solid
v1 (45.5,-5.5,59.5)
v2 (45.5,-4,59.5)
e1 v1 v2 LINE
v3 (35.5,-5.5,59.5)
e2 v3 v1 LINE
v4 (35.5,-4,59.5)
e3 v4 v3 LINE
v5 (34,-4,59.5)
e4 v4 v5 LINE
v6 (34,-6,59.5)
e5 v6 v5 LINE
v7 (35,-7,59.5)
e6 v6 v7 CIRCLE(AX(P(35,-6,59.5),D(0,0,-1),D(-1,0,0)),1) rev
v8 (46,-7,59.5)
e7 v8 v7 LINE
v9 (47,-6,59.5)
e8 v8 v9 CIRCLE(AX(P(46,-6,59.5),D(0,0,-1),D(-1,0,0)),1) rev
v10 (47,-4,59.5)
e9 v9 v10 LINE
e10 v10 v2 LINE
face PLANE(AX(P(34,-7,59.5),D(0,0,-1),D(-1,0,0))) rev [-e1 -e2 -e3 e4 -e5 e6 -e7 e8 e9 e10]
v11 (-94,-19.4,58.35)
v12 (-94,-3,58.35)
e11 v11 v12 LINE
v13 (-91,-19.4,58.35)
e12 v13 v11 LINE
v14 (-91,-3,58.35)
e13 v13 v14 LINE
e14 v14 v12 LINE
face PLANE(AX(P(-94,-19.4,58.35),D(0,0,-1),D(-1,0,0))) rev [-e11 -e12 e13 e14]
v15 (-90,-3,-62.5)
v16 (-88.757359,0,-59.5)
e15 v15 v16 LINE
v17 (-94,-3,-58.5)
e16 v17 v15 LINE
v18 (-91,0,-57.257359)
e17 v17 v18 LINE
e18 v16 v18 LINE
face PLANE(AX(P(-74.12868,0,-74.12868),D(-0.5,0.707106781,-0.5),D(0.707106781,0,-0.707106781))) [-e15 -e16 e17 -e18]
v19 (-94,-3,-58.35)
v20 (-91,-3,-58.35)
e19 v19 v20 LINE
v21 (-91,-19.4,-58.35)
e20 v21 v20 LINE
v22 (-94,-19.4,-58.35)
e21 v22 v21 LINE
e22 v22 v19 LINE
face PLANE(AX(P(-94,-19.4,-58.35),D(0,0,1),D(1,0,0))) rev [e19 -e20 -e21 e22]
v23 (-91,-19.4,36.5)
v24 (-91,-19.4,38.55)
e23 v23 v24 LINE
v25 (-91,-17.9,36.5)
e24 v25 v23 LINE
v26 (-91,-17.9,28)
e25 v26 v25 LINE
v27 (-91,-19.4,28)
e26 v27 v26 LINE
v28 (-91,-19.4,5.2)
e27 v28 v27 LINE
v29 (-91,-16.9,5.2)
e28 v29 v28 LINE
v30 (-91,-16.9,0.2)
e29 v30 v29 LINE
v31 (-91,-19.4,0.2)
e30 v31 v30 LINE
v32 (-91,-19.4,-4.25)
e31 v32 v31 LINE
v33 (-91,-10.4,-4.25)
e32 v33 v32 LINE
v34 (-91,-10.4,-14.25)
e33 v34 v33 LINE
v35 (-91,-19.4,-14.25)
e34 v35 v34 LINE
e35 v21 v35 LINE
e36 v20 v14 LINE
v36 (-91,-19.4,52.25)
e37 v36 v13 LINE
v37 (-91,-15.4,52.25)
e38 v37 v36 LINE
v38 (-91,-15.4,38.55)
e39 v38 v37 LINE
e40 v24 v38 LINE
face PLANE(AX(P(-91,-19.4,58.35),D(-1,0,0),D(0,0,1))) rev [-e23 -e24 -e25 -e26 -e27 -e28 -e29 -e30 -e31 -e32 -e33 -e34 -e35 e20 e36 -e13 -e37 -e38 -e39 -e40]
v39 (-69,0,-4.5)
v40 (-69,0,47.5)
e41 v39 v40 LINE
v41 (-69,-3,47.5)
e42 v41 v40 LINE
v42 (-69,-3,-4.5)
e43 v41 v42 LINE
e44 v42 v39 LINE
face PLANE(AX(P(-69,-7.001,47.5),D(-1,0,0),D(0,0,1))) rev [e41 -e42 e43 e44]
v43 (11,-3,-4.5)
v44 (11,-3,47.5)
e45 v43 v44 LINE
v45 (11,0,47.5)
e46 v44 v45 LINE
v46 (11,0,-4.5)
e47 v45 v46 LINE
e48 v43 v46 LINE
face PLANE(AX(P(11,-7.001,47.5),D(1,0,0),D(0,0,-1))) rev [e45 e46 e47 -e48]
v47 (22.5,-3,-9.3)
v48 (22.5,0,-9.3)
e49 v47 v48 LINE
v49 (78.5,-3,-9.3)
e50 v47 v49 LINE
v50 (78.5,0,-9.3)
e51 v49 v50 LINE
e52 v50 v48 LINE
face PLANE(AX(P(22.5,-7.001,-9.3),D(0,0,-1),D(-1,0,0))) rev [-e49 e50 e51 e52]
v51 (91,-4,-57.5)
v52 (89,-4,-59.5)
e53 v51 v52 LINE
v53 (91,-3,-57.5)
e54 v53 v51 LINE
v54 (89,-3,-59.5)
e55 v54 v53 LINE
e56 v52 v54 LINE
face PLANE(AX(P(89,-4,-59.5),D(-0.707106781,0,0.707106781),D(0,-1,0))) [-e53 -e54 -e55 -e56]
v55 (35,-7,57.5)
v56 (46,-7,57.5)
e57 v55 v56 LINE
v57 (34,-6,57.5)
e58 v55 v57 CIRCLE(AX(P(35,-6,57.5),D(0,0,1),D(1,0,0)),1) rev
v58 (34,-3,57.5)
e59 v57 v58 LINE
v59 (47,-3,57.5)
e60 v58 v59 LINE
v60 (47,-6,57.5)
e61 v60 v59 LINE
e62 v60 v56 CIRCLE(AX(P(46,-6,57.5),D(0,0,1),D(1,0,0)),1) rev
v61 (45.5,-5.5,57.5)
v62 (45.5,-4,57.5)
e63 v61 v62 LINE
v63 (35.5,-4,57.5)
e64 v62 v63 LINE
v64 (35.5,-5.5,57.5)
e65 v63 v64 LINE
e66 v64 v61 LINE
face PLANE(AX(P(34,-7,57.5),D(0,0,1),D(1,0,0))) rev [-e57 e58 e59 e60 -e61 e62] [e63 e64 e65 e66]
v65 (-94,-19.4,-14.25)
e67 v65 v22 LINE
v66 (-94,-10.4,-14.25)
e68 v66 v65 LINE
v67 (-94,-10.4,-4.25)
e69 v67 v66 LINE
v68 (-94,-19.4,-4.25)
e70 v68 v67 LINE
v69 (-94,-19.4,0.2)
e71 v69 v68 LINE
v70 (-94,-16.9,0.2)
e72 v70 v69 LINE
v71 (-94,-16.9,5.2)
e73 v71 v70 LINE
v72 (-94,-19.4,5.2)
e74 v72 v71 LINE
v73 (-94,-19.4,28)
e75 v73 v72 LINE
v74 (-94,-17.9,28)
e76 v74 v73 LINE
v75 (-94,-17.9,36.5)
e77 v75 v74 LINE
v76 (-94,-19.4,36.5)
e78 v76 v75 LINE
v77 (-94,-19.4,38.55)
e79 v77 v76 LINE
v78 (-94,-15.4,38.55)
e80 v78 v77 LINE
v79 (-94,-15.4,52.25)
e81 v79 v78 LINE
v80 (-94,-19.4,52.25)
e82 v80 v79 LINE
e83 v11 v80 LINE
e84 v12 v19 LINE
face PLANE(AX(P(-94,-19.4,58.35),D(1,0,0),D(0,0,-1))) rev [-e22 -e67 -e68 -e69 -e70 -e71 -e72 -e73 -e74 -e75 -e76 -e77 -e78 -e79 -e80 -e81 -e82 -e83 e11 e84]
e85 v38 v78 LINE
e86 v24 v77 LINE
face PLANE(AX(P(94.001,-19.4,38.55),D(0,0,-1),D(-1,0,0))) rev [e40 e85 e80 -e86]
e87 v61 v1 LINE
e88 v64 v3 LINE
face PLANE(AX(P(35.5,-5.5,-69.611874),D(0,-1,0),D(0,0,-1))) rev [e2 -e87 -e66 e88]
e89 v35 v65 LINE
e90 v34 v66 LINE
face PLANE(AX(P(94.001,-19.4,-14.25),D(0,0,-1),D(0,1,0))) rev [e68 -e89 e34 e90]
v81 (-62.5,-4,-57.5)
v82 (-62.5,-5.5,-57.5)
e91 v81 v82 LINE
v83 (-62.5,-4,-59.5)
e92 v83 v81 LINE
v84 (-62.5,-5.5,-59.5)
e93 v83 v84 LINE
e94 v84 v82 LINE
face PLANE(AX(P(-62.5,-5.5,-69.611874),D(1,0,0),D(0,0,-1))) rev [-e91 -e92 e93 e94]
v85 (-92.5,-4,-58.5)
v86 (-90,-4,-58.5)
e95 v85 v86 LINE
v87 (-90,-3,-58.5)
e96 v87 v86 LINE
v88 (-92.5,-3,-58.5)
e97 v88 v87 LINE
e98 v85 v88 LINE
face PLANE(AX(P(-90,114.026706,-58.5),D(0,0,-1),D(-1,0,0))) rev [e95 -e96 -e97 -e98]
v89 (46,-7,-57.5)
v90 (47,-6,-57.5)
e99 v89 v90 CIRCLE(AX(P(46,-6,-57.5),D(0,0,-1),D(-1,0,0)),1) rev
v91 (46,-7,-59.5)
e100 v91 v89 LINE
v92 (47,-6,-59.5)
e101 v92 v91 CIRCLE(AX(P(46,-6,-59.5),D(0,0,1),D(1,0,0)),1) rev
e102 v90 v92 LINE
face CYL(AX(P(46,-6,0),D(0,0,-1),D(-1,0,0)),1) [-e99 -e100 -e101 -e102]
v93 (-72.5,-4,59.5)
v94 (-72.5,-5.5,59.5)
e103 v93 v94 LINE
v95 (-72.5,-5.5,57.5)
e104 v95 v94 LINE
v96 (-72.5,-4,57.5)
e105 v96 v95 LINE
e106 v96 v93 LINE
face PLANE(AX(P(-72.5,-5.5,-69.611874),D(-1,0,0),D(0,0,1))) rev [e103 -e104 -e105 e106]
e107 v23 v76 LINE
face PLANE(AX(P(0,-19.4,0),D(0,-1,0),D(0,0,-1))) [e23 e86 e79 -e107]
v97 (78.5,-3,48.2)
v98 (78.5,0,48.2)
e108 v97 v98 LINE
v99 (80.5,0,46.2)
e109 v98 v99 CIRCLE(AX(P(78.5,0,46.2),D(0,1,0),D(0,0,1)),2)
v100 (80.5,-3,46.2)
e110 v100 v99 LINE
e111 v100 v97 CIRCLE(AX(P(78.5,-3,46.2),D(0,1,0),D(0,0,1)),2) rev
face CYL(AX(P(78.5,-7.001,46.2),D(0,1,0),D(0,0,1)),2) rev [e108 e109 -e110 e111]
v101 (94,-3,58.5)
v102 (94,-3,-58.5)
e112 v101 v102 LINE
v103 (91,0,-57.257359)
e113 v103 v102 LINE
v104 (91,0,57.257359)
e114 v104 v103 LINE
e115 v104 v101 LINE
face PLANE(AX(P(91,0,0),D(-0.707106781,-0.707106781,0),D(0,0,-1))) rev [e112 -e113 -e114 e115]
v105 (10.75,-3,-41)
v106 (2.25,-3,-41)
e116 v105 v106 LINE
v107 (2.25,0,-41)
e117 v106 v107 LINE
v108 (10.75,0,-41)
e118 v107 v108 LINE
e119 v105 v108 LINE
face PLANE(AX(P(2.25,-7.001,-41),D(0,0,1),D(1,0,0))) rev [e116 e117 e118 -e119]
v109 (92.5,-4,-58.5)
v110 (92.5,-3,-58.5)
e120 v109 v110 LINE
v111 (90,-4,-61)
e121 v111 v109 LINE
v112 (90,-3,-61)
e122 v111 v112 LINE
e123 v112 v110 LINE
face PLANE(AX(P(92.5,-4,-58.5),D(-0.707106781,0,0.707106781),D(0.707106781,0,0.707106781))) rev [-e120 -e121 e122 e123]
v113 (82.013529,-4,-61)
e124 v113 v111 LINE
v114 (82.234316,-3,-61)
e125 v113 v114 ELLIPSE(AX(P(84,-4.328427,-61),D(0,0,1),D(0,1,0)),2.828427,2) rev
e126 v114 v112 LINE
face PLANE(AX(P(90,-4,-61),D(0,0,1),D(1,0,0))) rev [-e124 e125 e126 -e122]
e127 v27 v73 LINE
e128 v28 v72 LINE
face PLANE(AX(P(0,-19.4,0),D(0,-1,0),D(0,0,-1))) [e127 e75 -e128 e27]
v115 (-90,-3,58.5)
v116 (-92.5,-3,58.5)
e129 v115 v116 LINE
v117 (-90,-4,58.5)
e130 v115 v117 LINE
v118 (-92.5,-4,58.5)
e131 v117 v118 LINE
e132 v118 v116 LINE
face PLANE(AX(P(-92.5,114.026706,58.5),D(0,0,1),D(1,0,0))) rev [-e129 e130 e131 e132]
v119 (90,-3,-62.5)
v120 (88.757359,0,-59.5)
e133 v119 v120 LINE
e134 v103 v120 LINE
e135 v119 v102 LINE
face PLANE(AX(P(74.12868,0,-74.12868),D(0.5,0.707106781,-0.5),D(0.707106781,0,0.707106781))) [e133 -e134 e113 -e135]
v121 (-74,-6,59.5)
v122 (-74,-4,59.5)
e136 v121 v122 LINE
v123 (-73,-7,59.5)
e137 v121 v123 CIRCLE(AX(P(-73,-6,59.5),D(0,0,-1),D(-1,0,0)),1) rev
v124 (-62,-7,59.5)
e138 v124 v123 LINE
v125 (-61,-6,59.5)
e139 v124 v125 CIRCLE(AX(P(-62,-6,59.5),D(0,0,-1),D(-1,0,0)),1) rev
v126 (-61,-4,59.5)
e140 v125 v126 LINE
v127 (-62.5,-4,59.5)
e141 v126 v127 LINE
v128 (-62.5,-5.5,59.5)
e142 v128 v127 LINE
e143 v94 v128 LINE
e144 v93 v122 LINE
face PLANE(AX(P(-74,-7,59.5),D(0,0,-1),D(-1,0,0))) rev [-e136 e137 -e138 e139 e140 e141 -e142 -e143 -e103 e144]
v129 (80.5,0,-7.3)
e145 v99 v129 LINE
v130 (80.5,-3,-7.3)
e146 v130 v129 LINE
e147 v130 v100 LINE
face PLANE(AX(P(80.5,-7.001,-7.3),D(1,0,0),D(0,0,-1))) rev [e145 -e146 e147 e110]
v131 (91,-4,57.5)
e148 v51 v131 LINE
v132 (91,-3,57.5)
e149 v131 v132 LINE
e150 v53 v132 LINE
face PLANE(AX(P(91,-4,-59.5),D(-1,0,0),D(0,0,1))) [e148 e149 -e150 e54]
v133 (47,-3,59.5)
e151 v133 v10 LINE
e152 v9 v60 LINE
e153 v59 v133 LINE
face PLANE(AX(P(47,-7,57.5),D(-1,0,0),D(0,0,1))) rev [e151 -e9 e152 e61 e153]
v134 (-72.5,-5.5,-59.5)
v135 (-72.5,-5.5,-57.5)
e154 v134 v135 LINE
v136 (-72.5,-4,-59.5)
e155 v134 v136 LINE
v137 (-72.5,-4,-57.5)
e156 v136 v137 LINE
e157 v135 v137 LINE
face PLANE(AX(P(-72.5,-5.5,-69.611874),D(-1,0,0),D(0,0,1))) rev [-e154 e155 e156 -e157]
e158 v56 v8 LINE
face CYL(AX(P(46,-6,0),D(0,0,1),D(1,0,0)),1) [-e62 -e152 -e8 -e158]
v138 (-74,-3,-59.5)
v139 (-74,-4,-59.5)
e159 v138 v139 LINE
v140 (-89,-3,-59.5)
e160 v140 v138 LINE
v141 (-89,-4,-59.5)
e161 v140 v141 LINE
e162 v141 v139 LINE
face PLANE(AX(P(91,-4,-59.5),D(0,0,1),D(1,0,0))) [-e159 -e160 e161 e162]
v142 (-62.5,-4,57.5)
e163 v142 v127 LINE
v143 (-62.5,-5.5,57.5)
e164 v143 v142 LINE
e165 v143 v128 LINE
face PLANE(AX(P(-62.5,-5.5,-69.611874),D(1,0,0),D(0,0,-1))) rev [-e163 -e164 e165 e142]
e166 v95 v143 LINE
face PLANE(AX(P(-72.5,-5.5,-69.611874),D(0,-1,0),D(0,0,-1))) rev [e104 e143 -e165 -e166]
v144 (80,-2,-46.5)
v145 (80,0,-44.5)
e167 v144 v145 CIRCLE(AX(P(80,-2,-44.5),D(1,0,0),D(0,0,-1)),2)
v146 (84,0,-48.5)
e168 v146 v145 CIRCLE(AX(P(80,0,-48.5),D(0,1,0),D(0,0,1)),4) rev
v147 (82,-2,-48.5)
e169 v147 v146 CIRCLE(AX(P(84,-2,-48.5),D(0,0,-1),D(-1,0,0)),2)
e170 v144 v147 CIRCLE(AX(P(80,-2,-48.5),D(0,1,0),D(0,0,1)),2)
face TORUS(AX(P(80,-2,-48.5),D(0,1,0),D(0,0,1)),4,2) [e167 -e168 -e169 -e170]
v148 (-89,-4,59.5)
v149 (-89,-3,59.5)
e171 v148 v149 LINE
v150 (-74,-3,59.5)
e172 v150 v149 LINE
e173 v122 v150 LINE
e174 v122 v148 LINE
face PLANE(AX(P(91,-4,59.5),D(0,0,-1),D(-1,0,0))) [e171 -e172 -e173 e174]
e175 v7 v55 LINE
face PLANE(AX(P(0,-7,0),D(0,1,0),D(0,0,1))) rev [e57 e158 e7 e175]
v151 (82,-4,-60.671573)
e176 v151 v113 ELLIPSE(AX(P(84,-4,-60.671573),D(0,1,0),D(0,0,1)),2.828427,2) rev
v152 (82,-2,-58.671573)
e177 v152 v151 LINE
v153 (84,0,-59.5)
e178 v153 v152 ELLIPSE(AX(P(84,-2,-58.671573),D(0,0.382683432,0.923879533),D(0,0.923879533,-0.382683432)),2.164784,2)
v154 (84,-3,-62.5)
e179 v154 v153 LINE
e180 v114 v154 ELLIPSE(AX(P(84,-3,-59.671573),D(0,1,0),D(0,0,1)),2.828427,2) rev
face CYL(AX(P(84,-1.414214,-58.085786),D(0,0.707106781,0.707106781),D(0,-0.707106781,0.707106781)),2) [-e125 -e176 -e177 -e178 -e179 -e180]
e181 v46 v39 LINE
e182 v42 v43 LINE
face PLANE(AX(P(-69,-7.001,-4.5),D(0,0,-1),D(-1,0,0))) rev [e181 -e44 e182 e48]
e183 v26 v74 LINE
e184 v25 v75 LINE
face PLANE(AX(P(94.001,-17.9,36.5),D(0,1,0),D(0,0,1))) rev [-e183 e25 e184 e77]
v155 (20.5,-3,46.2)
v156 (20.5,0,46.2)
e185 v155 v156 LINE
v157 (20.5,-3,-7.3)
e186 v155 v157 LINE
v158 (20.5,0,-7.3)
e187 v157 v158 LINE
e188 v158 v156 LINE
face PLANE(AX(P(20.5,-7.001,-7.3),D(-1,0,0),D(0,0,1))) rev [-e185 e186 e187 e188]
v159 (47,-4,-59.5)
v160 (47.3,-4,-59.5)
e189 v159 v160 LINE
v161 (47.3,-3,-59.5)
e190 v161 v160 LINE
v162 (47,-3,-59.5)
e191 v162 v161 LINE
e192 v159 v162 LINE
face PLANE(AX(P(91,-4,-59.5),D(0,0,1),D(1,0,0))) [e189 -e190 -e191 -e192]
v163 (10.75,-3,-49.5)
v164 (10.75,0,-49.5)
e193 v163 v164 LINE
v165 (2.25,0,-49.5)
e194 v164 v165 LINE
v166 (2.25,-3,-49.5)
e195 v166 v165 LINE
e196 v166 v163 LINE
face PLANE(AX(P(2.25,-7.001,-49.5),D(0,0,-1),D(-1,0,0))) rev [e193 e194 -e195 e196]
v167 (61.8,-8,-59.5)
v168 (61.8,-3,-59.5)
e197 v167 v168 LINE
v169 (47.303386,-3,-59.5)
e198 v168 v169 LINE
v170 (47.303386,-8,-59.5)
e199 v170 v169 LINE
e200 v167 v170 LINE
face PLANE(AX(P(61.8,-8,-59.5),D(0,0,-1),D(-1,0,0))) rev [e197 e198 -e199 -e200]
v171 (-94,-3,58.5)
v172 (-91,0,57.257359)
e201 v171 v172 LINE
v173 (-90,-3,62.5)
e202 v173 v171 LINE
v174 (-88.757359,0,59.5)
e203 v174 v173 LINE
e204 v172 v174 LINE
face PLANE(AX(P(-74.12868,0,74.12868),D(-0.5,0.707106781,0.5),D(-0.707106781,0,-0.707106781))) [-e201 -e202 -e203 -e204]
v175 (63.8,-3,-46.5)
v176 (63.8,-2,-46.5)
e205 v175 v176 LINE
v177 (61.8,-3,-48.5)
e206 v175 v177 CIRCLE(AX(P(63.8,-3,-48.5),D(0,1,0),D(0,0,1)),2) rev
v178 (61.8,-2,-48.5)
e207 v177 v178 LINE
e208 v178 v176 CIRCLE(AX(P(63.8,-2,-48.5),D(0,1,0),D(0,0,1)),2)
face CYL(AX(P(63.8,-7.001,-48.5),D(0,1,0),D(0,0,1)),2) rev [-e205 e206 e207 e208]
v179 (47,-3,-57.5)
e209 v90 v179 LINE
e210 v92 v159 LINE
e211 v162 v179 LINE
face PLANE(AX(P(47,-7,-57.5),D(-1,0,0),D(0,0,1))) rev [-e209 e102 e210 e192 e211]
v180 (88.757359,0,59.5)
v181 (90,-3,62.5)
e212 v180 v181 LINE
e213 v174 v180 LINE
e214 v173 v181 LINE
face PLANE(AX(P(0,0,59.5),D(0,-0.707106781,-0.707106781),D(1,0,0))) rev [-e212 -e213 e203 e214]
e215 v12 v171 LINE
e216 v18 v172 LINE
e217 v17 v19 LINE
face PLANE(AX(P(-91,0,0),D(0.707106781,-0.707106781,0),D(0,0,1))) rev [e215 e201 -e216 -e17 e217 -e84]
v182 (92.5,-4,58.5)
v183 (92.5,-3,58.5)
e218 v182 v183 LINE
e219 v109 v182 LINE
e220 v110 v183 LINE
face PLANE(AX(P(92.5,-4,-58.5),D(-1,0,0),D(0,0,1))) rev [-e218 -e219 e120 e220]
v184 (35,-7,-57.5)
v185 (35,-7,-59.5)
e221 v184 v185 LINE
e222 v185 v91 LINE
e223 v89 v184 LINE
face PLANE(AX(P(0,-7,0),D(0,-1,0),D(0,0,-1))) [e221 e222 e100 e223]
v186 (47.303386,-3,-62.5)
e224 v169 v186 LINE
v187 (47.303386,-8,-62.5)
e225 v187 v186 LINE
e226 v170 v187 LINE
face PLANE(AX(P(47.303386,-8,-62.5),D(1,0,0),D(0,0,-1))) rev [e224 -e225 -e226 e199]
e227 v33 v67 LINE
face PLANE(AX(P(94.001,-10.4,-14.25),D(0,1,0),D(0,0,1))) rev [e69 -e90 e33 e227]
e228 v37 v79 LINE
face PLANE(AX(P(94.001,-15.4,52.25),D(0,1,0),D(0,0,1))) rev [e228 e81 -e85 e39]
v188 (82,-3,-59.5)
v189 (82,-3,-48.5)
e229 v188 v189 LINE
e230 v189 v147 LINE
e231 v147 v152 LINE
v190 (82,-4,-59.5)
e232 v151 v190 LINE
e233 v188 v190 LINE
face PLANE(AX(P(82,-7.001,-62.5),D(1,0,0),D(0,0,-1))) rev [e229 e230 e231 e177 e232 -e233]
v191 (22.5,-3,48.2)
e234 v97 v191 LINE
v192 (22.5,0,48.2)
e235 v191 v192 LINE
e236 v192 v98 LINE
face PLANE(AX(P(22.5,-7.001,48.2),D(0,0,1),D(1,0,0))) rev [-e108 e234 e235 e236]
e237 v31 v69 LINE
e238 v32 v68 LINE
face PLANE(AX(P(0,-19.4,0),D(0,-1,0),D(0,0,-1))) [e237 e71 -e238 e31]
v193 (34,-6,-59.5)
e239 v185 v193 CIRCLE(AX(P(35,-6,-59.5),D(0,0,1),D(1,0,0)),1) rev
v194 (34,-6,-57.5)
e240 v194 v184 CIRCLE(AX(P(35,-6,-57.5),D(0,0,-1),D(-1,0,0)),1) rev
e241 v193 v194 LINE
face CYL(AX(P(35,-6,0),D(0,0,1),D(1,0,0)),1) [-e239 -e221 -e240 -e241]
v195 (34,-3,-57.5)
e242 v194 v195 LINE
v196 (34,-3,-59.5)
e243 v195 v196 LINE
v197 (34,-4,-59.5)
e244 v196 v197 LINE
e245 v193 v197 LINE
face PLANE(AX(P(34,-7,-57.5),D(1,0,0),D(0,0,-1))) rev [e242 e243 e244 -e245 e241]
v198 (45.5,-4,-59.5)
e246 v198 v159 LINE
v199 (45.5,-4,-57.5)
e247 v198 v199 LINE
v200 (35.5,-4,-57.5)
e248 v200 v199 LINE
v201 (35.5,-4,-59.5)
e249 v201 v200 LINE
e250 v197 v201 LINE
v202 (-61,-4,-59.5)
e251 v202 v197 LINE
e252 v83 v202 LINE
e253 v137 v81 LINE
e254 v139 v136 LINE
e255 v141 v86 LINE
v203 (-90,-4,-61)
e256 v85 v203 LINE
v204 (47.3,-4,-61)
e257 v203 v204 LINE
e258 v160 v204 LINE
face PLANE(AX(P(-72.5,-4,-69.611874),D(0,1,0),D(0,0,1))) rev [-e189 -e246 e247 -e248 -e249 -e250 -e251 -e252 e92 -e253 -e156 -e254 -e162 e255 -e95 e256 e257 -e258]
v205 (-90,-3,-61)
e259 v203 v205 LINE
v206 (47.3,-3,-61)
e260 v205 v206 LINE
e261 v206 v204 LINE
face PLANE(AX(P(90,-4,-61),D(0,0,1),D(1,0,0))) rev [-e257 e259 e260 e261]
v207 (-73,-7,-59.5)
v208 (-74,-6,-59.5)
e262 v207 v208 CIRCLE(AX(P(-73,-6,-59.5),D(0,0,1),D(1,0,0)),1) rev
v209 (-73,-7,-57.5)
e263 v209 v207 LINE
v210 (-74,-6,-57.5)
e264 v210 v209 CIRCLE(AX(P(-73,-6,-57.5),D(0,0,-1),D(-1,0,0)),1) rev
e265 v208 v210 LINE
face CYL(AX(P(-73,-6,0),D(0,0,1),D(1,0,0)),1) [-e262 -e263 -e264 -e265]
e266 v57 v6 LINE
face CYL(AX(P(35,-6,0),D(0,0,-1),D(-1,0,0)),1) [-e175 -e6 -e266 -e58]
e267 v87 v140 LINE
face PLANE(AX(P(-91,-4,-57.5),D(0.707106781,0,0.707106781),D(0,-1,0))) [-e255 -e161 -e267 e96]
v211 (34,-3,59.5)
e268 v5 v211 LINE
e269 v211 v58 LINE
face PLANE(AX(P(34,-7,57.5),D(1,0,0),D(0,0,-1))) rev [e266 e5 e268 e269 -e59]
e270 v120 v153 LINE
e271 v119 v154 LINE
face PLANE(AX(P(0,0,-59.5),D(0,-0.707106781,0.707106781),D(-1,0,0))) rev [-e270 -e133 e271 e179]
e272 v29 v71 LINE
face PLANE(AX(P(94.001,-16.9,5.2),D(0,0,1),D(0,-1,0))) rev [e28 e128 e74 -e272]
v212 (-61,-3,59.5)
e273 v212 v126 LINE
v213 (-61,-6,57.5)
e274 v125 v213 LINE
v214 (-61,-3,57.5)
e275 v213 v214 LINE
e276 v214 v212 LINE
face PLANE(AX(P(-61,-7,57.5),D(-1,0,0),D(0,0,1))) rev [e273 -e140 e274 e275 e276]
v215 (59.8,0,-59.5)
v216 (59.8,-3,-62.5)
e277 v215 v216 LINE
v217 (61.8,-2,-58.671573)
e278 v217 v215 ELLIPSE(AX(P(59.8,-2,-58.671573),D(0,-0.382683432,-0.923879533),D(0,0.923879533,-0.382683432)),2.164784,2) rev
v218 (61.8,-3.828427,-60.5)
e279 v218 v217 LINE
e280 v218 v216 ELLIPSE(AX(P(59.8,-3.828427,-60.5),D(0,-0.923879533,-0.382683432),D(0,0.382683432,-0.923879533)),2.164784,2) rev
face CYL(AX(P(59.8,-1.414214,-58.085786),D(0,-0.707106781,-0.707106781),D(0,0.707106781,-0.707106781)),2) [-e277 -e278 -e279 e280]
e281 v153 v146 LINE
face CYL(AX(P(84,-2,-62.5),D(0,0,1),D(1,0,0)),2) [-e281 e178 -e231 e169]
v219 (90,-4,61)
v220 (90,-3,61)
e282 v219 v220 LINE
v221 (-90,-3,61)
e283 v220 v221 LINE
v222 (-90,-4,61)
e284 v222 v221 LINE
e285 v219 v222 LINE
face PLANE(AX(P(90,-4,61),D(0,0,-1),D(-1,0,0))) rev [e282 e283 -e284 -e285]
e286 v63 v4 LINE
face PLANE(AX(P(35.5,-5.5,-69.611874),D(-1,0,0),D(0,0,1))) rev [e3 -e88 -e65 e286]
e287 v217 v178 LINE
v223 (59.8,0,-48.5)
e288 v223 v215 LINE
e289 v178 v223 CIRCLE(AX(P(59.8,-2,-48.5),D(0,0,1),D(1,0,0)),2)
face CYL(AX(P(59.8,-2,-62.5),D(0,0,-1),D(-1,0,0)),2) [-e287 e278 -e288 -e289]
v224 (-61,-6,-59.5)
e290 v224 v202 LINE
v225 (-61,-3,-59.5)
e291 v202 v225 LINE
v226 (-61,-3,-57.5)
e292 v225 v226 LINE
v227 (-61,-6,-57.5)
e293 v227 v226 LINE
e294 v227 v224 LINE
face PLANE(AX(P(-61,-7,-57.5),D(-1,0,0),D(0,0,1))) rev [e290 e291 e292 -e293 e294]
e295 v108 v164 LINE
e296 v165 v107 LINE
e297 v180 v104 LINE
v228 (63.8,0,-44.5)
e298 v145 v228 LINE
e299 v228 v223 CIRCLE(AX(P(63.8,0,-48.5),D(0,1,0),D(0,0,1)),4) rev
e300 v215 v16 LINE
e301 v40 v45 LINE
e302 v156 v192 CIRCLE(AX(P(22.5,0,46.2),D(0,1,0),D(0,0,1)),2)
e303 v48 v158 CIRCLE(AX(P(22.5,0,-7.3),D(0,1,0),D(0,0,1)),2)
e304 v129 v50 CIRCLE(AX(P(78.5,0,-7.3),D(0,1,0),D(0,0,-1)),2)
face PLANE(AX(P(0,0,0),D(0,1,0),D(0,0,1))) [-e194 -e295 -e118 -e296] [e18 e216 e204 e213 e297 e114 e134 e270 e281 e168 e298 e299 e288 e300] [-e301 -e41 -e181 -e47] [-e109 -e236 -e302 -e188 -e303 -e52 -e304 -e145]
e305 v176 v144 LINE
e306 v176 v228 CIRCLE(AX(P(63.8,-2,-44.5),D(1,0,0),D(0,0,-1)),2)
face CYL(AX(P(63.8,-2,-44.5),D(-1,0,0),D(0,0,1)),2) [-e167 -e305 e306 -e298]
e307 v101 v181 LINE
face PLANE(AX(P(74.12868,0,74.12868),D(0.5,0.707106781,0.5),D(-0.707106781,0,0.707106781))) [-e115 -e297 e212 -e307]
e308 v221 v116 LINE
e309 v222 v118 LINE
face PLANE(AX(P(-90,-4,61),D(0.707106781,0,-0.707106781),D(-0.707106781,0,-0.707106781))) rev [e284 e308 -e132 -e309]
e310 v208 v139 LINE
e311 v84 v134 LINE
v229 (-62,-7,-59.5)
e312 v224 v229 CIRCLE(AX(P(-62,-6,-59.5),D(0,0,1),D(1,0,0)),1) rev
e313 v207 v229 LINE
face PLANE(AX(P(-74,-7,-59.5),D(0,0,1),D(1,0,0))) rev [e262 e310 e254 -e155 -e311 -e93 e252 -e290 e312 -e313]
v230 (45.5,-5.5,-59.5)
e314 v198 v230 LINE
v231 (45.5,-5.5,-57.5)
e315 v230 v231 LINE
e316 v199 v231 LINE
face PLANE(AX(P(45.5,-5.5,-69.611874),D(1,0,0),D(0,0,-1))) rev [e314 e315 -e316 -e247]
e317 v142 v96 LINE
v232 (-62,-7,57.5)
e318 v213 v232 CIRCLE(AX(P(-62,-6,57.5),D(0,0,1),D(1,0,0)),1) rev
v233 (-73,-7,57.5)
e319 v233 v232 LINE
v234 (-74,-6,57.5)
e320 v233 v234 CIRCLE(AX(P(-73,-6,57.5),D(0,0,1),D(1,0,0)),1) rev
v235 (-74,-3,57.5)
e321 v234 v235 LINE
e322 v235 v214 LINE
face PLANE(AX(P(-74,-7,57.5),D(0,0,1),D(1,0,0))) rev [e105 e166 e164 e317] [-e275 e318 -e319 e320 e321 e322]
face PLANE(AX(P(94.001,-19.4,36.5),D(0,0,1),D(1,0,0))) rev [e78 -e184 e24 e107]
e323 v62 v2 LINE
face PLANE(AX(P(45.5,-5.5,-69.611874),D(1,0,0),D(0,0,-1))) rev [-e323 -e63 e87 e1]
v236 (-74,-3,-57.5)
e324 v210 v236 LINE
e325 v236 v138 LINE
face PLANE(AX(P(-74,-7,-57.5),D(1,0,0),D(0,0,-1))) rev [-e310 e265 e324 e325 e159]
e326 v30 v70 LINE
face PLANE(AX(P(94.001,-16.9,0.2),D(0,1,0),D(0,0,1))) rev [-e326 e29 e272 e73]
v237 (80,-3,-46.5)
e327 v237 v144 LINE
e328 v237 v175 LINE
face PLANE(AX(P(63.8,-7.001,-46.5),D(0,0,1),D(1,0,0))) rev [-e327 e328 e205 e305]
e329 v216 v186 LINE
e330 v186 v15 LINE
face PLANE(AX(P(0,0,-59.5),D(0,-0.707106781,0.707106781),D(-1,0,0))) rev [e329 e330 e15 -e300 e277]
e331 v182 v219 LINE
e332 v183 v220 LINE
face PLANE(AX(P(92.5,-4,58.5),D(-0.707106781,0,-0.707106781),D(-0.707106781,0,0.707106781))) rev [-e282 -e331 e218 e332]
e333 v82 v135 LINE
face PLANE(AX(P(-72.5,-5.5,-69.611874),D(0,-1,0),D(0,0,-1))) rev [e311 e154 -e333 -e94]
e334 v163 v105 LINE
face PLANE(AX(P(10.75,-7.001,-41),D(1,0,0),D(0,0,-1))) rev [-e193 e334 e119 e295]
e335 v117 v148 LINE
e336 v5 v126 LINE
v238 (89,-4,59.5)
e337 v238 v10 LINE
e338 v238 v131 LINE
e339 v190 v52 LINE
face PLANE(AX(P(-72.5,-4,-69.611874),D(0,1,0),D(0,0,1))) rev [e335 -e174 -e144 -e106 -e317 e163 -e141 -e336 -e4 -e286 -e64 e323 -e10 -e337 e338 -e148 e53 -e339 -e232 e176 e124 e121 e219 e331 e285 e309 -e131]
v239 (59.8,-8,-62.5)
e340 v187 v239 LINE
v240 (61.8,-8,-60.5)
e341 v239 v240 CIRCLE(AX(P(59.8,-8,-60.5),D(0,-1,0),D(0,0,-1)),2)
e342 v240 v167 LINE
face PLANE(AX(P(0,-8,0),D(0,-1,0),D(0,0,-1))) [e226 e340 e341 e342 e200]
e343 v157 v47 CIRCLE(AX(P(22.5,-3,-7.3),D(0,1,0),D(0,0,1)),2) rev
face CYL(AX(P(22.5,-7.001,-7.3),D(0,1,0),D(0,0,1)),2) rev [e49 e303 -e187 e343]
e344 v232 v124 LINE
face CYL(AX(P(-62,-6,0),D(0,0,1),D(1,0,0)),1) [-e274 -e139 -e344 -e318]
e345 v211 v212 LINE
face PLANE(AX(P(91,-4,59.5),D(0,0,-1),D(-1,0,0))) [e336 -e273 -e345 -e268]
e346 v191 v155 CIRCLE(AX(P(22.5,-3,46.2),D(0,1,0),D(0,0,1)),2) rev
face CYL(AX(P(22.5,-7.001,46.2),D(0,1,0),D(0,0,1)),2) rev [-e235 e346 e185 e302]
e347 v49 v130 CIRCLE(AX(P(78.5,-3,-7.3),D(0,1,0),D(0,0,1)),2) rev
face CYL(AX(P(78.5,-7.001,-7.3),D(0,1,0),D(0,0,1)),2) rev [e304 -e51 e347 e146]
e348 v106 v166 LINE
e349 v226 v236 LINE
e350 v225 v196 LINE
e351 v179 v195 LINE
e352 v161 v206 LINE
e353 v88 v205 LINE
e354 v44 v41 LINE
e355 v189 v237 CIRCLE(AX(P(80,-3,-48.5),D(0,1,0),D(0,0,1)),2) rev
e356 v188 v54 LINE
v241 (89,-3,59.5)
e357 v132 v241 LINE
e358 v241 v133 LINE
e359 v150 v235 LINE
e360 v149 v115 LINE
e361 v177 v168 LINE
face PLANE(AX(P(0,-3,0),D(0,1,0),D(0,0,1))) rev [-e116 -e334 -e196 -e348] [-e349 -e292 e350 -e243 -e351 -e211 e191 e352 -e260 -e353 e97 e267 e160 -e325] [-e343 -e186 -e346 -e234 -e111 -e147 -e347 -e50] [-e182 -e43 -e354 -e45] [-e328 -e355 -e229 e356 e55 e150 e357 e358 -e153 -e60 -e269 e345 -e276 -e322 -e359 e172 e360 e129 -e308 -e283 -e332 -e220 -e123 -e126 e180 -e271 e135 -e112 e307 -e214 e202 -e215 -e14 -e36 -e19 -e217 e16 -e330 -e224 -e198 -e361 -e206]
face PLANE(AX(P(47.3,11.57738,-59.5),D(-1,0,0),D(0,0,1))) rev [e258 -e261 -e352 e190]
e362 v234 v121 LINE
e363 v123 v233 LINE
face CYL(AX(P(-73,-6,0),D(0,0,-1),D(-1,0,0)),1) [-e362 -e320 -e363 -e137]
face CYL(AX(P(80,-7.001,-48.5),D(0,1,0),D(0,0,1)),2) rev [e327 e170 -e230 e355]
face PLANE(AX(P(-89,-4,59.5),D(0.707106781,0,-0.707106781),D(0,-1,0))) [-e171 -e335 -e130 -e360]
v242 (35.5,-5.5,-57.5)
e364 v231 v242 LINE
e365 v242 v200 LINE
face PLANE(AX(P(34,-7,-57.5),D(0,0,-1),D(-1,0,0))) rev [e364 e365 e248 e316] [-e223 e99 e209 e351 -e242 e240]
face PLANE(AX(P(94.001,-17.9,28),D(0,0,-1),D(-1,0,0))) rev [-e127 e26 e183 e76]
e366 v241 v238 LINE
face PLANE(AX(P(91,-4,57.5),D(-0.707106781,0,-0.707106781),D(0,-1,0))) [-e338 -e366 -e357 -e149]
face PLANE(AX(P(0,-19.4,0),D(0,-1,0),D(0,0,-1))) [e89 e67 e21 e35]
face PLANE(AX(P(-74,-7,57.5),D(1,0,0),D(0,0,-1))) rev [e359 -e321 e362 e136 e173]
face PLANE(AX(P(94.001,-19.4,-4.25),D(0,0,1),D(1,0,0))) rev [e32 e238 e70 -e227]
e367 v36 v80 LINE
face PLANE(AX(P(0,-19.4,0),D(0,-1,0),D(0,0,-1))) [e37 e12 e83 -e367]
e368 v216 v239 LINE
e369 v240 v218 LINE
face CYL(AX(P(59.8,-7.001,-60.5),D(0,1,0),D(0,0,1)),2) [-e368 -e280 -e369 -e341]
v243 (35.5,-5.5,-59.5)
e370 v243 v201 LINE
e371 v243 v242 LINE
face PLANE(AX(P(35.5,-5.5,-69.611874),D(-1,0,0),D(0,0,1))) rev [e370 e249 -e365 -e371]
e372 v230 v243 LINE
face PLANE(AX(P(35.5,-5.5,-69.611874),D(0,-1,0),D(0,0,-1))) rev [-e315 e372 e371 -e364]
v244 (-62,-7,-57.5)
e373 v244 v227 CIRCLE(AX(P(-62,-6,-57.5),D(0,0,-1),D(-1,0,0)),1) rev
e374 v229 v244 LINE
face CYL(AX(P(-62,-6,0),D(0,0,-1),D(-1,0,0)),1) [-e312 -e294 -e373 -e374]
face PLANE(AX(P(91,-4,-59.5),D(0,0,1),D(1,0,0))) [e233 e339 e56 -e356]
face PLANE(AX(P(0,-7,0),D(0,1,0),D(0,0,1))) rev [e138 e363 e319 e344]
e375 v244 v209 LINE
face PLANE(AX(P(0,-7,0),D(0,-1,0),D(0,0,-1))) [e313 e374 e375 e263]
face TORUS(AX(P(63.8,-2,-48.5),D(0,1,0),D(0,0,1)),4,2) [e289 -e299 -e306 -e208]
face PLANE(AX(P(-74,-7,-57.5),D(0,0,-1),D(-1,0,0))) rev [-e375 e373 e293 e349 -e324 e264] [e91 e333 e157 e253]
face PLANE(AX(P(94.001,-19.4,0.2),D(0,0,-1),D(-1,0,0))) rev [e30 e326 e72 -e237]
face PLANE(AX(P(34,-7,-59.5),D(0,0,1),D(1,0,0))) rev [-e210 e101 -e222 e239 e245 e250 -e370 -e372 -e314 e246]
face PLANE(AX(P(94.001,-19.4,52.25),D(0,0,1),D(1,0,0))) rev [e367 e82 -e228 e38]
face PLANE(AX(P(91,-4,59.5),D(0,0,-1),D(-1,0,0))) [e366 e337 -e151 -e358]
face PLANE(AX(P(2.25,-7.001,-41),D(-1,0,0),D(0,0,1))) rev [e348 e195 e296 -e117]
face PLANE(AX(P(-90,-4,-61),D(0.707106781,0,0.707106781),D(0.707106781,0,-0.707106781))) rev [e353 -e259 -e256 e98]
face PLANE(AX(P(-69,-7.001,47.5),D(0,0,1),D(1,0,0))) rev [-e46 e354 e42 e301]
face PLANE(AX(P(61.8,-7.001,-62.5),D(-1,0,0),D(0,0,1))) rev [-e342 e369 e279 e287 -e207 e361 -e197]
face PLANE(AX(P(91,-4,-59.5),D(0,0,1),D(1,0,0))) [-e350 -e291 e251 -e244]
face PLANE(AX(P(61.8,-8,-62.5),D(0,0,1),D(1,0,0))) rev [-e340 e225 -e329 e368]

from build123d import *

# Parameters (mm, degrees)
EXTRUDE_1_DEPTH     = 3
SKETCH_2_W          = 13.000000000000007
SKETCH_2_H          = 2.000000000000014
SKETCH_2_W_2        = 12.999999999999993
EXTRUDE_2_DEPTH     = 4
CUT_EXTRUDE_1_REACH = 156.172
SKETCH_3_W          = 10.000000000000021
SKETCH_3_H          = 1.5
SKETCH_3_W_2        = 10
FILLET_1_R          = 1
CHAMFER_1_SIZE      = 4
CHAMFER_2_SIZE      = 3
EXTRUDE_3_DEPTH     = 1
CHAMFER_3_SIZE      = 2
CUT_EXTRUDE_2_REACH = 115.098
CUT_EXTRUDE_3_DEPTH = 1
EXTRUDE_4_DEPTH     = 16.4
CUT_EXTRUDE_4_REACH = 201.064
SKETCH_9_W          = 8.500000000000004
SKETCH_9_H          = 1.5000000000000036
SKETCH_10_W         = 14.5
SKETCH_10_H         = 1.5000000000000284
CUT_EXTRUDE_5_DEPTH = 1
SKETCH_11_W         = 14.496613720637008
SKETCH_11_H         = 3.000000000000007
EXTRUDE_5_DEPTH     = 5
FILLET_2_R          = 2


with BuildPart() as part:
    # 草图1 → 凸台-拉伸1 (new body)
    with BuildSketch(Plane(origin=(0, 0, 0), x_dir=(1, 0, 0), z_dir=(0, 1, 0))):
        Polygon((93.99999999999997, -62.499999999999964), (-94.00000000000001, -62.5), (-94.00000000000003, 62.500000000000014), (93.99999999999997, 62.50000000000004), align=None)
    extrude(amount=-EXTRUDE_1_DEPTH)

    # 草图2 → 凸台-拉伸2 (add)
    with BuildSketch(Plane.XZ.offset(3)):
        with Locations((-67.50000000000003, 58.5)):
            Rectangle(SKETCH_2_W, SKETCH_2_H)
        with Locations((40.49999999999994, 58.5)):
            Rectangle(SKETCH_2_W_2, SKETCH_2_H)
        with Locations((40.49999999999994, -58.5)):
            Rectangle(SKETCH_2_W_2, SKETCH_2_H)
        with Locations((-67.50000000000003, -58.5)):
            Rectangle(SKETCH_2_W, SKETCH_2_H)
    extrude(amount=EXTRUDE_2_DEPTH)

    # 切除-拉伸1: up to this face of the body (flat: up to its plane)
    cut_extrude_1_end = Plane(part.part.faces().sort_by_distance((40.5, -5, -59.5))[0])
    # 草图3 → 切除-拉伸1 (cut, up to the picked face)
    with BuildSketch(Plane.XY.offset(59.500000000000036), mode=Mode.PRIVATE) as cut_extrude_1_sk1:
        with Locations((-67.5, -4.75)):
            Rectangle(SKETCH_3_W, SKETCH_3_H)
    cut_extrude_1_tool1 = split(extrude(cut_extrude_1_sk1.sketch, amount=-CUT_EXTRUDE_1_REACH, mode=Mode.PRIVATE), bisect_by=cut_extrude_1_end, keep=Keep.BOTH, mode=Mode.PRIVATE)
    # 草图3 → 切除-拉伸1 (cut, up to the picked face)
    with BuildSketch(Plane.XY.offset(59.500000000000036), mode=Mode.PRIVATE) as cut_extrude_1_sk2:
        with Locations((40.499999999999986, -4.75)):
            Rectangle(SKETCH_3_W_2, SKETCH_3_H)
    cut_extrude_1_tool2 = split(extrude(cut_extrude_1_sk2.sketch, amount=-CUT_EXTRUDE_1_REACH, mode=Mode.PRIVATE), bisect_by=cut_extrude_1_end, keep=Keep.BOTH, mode=Mode.PRIVATE)
    add(cut_extrude_1_tool1.solids().sort_by(Axis((-67.5, -4.75, 59.5), (0, 0, -1)))[0], mode=Mode.SUBTRACT)
    add(cut_extrude_1_tool2.solids().sort_by(Axis((40.5, -4.75, 59.5), (0, 0, -1)))[0], mode=Mode.SUBTRACT)

    # 圆角1
    fillet_1_edges = [part.edges().sort_by_distance(p)[0] for p in [
        (-74.00000000000003, -7, 58.5),
        (-61.00000000000003, -7, 58.5),
        (33.99999999999995, -7, 58.5),
        (46.99999999999994, -7, 58.5),
        (33.99999999999995, -7, -58.5),
        (46.99999999999994, -7, -58.5),
        (-74.00000000000003, -7, -58.5),
        (-61.00000000000003, -7, -58.5),
    ]]
    fillet(fillet_1_edges, radius=FILLET_1_R)

    # 倒角1
    chamfer_1_edges = [part.edges().sort_by_distance(p)[0] for p in [
        (-94.00000000000003, -1.5, -62.500000000000014),
        (93.99999999999997, -1.5, -62.50000000000004),
        (93.99999999999997, -1.5, 62.499999999999964),
        (-94.00000000000001, -1.5, 62.5),
    ]]
    chamfer(chamfer_1_edges, length=CHAMFER_1_SIZE)

    # 倒角2
    chamfer_2_edges = [part.edges().sort_by_distance(p)[0] for p in [
        (91.99999999999997, 0, -60.50000000000005),
        (-2.842e-14, 0, -62.50000000000003),
        (-92.00000000000004, 0, -60.50000000000002),
        (-94.00000000000001, 0, -7.11e-15),
        (-92.00000000000003, 0, 60.5),
        (-2.842e-14, 0, 62.499999999999986),
        (91.99999999999999, 0, 60.499999999999964),
        (93.99999999999997, 0, -4.974e-14),
    ]]
    chamfer(chamfer_2_edges, length=CHAMFER_2_SIZE - 0.0001)  # a hair under: the kernel refuses the full size

    # 草图4 → 凸台-拉伸3 (add)
    with BuildSketch(Plane.XZ.offset(3)):
        Polygon((-89.99999999999997, -61.00000000000003), (-92.49999999999997, -58.50000000000002), (-92.49999999999999, 58.499999999999964), (-89.99999999999999, 60.999999999999964), (90.00000000000001, 60.99999999999999), (92.50000000000001, 58.49999999999999), (92.50000000000003, -58.5), (90.00000000000003, -61.00000000000001), align=None)
        Polygon((91, -59.49999999999999), (-91, -59.500000000000014), (-91, 59.49999999999998), (91, 59.50000000000001), align=None, mode=Mode.SUBTRACT)
    extrude(amount=EXTRUDE_3_DEPTH)

    # 倒角3
    chamfer_3_edges = [part.edges().sort_by_distance(p)[0] for p in [
        (91, -3.5, -59.49999999999999),
        (-91, -3.5, 59.49999999999998),
        (-91, -3.5, -59.500000000000014),
        (91, -3.5, 59.50000000000001),
    ]]
    chamfer(chamfer_3_edges, length=CHAMFER_3_SIZE)

    # 草图5 → 切除-拉伸2 (cut, up to next)
    with BuildSketch(Plane(origin=(0, 0, 0), x_dir=(1, 0, 0), z_dir=(0, 1, 0)), mode=Mode.PRIVATE) as cut_extrude_2_sk1:
        Polygon((-68.99999999999999, -47.49999999999995), (11.00000000000001, -47.49999999999995), (11.00000000000001, 4.500000000000045), (-68.99999999999999, 4.500000000000047), align=None)
    cut_extrude_2_tool1 = extrude(cut_extrude_2_sk1.sketch, amount=-CUT_EXTRUDE_2_REACH, mode=Mode.PRIVATE) & part.part
    # 草图5 → 切除-拉伸2 (cut, up to next)
    with BuildSketch(Plane(origin=(0, 0, 0), x_dir=(1, 0, 0), z_dir=(0, 1, 0)), mode=Mode.PRIVATE) as cut_extrude_2_sk2:
        Polygon((2.249999999999944, 40.99999999999997), (10.749999999999943, 40.99999999999997), (10.749999999999941, 49.49999999999997), (2.2499999999999423, 49.499999999999964), align=None)
    cut_extrude_2_tool2 = extrude(cut_extrude_2_sk2.sketch, amount=-CUT_EXTRUDE_2_REACH, mode=Mode.PRIVATE) & part.part
    # 草图5 → 切除-拉伸2 (cut, up to next)
    with BuildSketch(Plane(origin=(0, 0, 0), x_dir=(1, 0, 0), z_dir=(0, 1, 0)), mode=Mode.PRIVATE) as cut_extrude_2_sk3:
        with BuildLine():
            Line((61.79999999999998, 62.50000000000004), (81.99999999999997, 62.50000000000004))
            Line((81.99999999999997, 62.50000000000004), (81.99999999999997, 48.50000000000004))
            ThreePointArc((81.99999999999997, 48.50000000000004), (81.41421356237306, 47.08578643762695), (79.99999999999997, 46.50000000000004))
            Line((79.99999999999997, 46.50000000000004), (63.79999999999998, 46.50000000000004))
            ThreePointArc((63.79999999999998, 46.50000000000004), (62.38578643762689, 47.08578643762695), (61.79999999999998, 48.50000000000004))
            Line((61.79999999999998, 48.50000000000004), (61.79999999999998, 62.50000000000004))
        make_face()
    cut_extrude_2_tool3 = extrude(cut_extrude_2_sk3.sketch, amount=-CUT_EXTRUDE_2_REACH, mode=Mode.PRIVATE) & part.part
    # 草图5 → 切除-拉伸2 (cut, up to next)
    with BuildSketch(Plane(origin=(0, 0, 0), x_dir=(1, 0, 0), z_dir=(0, 1, 0)), mode=Mode.PRIVATE) as cut_extrude_2_sk4:
        with BuildLine():
            Line((22.500000000000018, 9.300000000000042), (78.49999999999999, 9.300000000000042))
            ThreePointArc((78.49999999999999, 9.300000000000042), (79.91421356237309, 8.714213562373137), (80.5, 7.300000000000027))
            Line((80.5, 7.300000000000027), (80.50000000000001, -46.199999999999946))
            ThreePointArc((80.50000000000001, -46.199999999999946), (79.9142135623731, -47.61421356237305), (78.5, -48.19999999999996))
            Line((78.5, -48.19999999999996), (22.500000000000025, -48.19999999999996))
            ThreePointArc((22.500000000000025, -48.19999999999996), (21.085786437626915, -47.61421356237305), (20.500000000000007, -46.199999999999946))
            Line((20.500000000000007, -46.199999999999946), (20.5, 7.300000000000027))
            ThreePointArc((20.5, 7.300000000000027), (21.085786437626904, 8.714213562373137), (22.500000000000018, 9.300000000000042))
        make_face()
    cut_extrude_2_tool4 = extrude(cut_extrude_2_sk4.sketch, amount=-CUT_EXTRUDE_2_REACH, mode=Mode.PRIVATE) & part.part
    add(cut_extrude_2_tool1.solids().sort_by_distance((-29, 0, 21.5))[0], mode=Mode.SUBTRACT)
    add(cut_extrude_2_tool2.solids().sort_by_distance((6.5, 0, -45.25))[0], mode=Mode.SUBTRACT)
    add(cut_extrude_2_tool3.solids().sort_by_distance((71.9, 0, -54.540337))[0], mode=Mode.SUBTRACT)
    add(cut_extrude_2_tool4.solids().sort_by_distance((50.5, 0, 19.45))[0], mode=Mode.SUBTRACT)

    # 草图7 → 切除-拉伸3 (cut)
    with BuildSketch(Plane.XZ.offset(4)):
        Polygon((-92.49999999999999, 58.499999999999964), (-89.99999999999994, 58.499999999999964), (-91, 57.49999999999998), (-91, -57.49999999999998), (-89.99999999999996, -58.50000000000002), (-92.49999999999997, -58.50000000000002), align=None)
    extrude(amount=-CUT_EXTRUDE_3_DEPTH, mode=Mode.SUBTRACT)

    # 草图8 → 凸台-拉伸4 (add)
    with BuildSketch(Plane.XZ.offset(3)):
        Polygon((-94.00000000000003, 58.349999999999966), (-91.00000000000003, 58.349999999999966), (-91.00000000000001, -58.35000000000003), (-94.00000000000001, -58.35000000000003), align=None)
    extrude(amount=EXTRUDE_4_DEPTH)

    # 草图9 → 切除-拉伸4 (cut, up to next)
    with BuildSketch(Plane.ZY.offset(94.00000000000003), mode=Mode.PRIVATE) as cut_extrude_4_sk1:
        Polygon((-14.25000000000002, -19.4), (-4.250000000000012, -19.4), (-4.250000000000012, -10.399999999999999), (-14.250000000000012, -10.399999999999999), align=None)
    cut_extrude_4_tool1 = extrude(cut_extrude_4_sk1.sketch, amount=-CUT_EXTRUDE_4_REACH, mode=Mode.PRIVATE) & part.part
    # 草图9 → 切除-拉伸4 (cut, up to next)
    with BuildSketch(Plane.ZY.offset(94.00000000000003), mode=Mode.PRIVATE) as cut_extrude_4_sk2:
        Polygon((52.24999999999998, -19.4), (38.54999999999998, -19.4), (38.54999999999998, -15.399999999999999), (52.24999999999998, -15.399999999999997), align=None)
    cut_extrude_4_tool2 = extrude(cut_extrude_4_sk2.sketch, amount=-CUT_EXTRUDE_4_REACH, mode=Mode.PRIVATE) & part.part
    # 草图9 → 切除-拉伸4 (cut, up to next)
    with BuildSketch(Plane.ZY.offset(94.00000000000003), mode=Mode.PRIVATE) as cut_extrude_4_sk3:
        Polygon((0.19999999999998752, -19.4), (0.19999999999998752, -16.9), (5.199999999999988, -16.9), (5.1999999999999895, -19.4), align=None)
    cut_extrude_4_tool3 = extrude(cut_extrude_4_sk3.sketch, amount=-CUT_EXTRUDE_4_REACH, mode=Mode.PRIVATE) & part.part
    # 草图9 → 切除-拉伸4 (cut, up to next)
    with BuildSketch(Plane.ZY.offset(94.00000000000003), mode=Mode.PRIVATE) as cut_extrude_4_sk4:
        with Locations((32.24999999999998, -18.65)):
            Rectangle(SKETCH_9_W, SKETCH_9_H)
    cut_extrude_4_tool4 = extrude(cut_extrude_4_sk4.sketch, amount=-CUT_EXTRUDE_4_REACH, mode=Mode.PRIVATE) & part.part
    add(cut_extrude_4_tool1.solids().sort_by_distance((-94, -14.9, -9.25))[0], mode=Mode.SUBTRACT)
    add(cut_extrude_4_tool2.solids().sort_by_distance((-94, -17.4, 45.4))[0], mode=Mode.SUBTRACT)
    add(cut_extrude_4_tool3.solids().sort_by_distance((-94, -18.15, 2.7))[0], mode=Mode.SUBTRACT)
    add(cut_extrude_4_tool4.solids().sort_by_distance((-94, -18.65, 32.25))[0], mode=Mode.SUBTRACT)

    # 草图10 → 切除-拉伸5 (cut)
    with BuildSketch(Plane.XZ.offset(4)):
        with Locations((54.54999999999998, -60.25000000000001)):
            Rectangle(SKETCH_10_W, SKETCH_10_H)
    extrude(amount=-CUT_EXTRUDE_5_DEPTH, mode=Mode.SUBTRACT)

    # 草图11 → 凸台-拉伸5 (add)
    with BuildSketch(Plane.XZ.offset(3)):
        with Locations((54.551693139681475, -61.00000000000004)):
            Rectangle(SKETCH_11_W, SKETCH_11_H)
    extrude(amount=EXTRUDE_5_DEPTH)

    # 圆角2
    fillet_2_edges = [part.edges().sort_by_distance(p)[0] for p in [
        (81.99999999999997, 0, -54.000050000000044),
        (81.41421356237306, 0, -47.08578643762695),
        (71.89999999999998, 0, -46.50000000000004),
        (62.38578643762689, 0, -47.08578643762695),
        (81.99999999999997, -1.499950000000006, -61.00005000000004),
        (61.79999999999998, -5.49995, -62.50000000000004),
        (61.79999999999998, -1.4999500000000077, -61.00005000000003),
        (61.79999999999998, 0, -54.000050000000044),
    ]]
    fillet(fillet_2_edges, radius=FILLET_2_R)


solid = part.part
